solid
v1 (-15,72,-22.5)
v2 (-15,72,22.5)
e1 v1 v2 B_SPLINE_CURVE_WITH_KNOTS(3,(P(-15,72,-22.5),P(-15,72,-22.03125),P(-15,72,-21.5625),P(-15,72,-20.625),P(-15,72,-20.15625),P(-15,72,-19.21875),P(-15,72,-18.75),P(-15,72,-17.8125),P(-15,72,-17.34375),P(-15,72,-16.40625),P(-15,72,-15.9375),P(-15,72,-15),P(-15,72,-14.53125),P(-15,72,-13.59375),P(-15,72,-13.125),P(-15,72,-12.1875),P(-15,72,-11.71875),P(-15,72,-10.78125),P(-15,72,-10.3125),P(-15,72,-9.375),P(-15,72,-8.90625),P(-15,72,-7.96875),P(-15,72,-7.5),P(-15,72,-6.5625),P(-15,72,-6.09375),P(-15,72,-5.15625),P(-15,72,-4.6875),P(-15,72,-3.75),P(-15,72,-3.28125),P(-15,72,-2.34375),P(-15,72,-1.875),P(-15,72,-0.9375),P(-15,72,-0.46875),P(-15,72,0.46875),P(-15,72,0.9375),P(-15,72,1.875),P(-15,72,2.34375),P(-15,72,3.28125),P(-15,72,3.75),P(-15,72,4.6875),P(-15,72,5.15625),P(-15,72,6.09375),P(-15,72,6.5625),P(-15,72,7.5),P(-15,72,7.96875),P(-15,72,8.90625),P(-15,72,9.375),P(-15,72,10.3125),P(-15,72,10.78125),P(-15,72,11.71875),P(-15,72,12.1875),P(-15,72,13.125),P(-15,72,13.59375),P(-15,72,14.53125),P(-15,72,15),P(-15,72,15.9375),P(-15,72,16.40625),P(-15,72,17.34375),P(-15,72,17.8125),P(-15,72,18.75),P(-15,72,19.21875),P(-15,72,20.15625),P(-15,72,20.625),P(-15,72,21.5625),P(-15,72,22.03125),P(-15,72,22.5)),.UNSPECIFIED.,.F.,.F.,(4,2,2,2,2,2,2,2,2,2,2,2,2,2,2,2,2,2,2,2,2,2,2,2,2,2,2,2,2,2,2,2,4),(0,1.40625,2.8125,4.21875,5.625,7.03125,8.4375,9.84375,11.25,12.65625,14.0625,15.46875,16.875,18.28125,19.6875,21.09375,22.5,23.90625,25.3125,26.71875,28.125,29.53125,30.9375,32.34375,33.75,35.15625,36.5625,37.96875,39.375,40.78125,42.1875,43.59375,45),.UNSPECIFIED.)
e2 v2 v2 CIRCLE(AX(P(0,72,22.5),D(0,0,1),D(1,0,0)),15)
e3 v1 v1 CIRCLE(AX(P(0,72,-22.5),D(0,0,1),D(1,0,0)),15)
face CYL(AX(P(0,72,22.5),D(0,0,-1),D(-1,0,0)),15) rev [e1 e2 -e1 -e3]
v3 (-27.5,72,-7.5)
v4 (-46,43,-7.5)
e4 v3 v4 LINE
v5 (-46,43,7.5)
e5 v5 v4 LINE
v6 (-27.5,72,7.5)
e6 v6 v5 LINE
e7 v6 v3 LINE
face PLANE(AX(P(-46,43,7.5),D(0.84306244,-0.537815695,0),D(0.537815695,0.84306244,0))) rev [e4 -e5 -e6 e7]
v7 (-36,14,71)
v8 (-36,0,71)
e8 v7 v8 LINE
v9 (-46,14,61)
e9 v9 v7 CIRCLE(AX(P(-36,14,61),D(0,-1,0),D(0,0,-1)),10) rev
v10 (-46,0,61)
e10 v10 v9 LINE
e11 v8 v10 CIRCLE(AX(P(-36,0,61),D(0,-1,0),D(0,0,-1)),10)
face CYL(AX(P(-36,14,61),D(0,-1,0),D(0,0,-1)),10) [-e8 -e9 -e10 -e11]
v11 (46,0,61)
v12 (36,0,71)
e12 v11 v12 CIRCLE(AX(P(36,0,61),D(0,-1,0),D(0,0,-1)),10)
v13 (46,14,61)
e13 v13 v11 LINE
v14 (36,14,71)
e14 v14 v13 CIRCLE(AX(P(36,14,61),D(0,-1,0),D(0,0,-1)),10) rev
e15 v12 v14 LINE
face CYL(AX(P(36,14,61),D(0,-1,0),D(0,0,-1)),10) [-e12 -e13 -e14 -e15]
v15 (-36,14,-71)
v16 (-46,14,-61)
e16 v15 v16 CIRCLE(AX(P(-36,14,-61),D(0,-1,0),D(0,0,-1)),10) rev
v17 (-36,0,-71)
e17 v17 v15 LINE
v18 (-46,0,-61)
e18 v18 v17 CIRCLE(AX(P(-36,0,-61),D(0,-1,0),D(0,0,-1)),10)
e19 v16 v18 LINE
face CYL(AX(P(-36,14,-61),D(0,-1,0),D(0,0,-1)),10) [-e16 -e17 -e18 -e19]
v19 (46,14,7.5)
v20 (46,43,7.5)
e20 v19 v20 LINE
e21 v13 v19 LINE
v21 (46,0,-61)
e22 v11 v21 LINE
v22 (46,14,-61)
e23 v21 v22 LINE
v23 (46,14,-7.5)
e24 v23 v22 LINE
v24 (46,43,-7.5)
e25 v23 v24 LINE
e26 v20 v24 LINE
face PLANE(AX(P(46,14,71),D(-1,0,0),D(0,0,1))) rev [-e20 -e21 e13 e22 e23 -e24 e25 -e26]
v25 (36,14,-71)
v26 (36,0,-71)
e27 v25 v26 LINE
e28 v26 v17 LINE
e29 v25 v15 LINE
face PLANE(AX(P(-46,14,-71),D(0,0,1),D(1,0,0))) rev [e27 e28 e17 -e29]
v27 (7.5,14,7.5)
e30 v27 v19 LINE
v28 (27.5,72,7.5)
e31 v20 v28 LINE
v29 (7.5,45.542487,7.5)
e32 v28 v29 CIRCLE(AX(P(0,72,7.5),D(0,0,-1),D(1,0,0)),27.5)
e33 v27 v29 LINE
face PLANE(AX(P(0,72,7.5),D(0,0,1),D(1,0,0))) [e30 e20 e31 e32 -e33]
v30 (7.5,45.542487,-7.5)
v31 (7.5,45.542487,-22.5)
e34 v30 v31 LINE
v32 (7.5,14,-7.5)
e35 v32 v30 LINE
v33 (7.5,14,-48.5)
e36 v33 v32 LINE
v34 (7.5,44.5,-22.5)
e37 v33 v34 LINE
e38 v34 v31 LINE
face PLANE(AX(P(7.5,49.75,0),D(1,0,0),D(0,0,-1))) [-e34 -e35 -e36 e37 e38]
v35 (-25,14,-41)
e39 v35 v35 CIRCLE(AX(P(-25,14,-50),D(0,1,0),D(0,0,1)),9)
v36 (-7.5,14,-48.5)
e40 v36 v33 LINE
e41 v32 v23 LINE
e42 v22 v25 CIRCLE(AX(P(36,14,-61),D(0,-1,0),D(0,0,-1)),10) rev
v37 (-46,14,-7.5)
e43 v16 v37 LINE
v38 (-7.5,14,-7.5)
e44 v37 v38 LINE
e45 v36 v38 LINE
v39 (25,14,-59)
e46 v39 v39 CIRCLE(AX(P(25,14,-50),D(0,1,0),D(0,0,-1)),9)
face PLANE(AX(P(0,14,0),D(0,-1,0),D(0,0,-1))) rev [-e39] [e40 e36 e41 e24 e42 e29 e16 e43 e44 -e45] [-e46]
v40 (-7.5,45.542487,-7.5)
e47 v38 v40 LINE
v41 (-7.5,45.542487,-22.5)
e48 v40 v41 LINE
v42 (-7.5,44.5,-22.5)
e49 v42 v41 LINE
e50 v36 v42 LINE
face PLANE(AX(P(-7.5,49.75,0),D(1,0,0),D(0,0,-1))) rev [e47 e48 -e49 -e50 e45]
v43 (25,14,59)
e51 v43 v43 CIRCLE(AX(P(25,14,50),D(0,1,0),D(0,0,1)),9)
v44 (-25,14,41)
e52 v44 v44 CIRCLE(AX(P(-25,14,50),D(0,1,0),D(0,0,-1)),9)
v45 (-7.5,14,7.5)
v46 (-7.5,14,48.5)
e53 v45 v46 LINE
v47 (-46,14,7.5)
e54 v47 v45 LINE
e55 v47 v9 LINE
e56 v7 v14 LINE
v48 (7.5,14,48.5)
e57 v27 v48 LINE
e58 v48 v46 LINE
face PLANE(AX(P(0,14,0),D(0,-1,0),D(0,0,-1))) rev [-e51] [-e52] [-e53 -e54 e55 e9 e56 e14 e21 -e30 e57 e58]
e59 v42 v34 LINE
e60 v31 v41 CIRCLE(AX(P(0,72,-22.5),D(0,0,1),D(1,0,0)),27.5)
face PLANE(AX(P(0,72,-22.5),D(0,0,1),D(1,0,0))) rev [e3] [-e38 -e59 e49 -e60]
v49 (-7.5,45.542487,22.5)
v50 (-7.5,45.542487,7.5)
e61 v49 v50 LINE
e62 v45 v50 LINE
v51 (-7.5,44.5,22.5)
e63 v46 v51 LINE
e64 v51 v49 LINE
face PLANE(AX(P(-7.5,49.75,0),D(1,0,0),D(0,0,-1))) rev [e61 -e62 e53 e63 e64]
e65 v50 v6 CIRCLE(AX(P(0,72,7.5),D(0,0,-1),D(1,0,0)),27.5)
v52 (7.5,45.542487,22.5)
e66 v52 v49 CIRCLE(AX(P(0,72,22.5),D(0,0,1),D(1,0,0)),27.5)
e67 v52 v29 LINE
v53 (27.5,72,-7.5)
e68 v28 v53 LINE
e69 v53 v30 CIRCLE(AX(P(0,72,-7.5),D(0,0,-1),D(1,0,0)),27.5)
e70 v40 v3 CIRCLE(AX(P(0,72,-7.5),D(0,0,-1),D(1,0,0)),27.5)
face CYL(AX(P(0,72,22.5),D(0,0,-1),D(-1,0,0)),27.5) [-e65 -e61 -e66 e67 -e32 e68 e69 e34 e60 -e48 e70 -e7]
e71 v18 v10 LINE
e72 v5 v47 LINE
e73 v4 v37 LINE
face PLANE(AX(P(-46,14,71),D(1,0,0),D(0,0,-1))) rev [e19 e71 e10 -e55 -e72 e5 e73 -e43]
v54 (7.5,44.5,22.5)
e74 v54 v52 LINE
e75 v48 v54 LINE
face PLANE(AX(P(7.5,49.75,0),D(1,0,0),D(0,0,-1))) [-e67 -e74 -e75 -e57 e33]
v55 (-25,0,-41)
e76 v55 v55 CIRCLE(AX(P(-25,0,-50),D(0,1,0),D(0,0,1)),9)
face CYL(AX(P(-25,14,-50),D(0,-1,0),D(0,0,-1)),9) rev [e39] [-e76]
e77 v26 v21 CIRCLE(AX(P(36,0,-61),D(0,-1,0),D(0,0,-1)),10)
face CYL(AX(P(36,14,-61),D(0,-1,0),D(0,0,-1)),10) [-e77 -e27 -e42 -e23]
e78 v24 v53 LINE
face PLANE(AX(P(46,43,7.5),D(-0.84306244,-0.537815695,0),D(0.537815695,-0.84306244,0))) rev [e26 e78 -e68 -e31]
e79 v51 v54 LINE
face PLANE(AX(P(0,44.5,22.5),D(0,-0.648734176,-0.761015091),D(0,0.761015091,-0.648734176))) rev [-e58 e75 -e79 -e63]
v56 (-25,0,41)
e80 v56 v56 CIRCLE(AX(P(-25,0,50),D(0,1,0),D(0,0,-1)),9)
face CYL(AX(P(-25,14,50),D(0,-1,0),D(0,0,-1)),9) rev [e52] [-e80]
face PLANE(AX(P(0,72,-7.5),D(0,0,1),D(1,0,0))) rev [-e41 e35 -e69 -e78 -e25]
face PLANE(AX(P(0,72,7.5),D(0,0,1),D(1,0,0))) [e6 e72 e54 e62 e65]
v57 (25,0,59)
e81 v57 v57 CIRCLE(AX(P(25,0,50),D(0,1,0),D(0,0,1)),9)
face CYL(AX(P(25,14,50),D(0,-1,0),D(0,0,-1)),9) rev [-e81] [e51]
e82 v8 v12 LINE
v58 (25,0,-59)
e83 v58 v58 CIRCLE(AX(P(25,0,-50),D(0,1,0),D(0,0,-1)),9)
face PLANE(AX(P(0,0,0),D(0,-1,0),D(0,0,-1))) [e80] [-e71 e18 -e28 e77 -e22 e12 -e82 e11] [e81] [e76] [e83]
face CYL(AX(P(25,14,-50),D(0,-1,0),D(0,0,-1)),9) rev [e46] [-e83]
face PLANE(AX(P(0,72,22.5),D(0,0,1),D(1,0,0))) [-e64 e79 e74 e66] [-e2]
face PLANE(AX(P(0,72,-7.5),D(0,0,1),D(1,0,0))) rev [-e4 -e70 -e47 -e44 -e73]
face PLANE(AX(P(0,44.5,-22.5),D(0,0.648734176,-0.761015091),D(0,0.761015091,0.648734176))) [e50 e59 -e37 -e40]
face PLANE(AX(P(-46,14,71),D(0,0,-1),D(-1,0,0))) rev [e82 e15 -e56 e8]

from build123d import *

# Parameters (mm, degrees)
ESQUISSE1_W        = 92
ESQUISSE1_H        = 142
ESQUISSE1_R        = 9
BOSS_EXTRU_1_DEPTH = 14
CONG_1_R           = 10
ESQUISSE2_R        = 27.5
ESQUISSE2_R_2      = 15
BOSS_EXTRU_2_DEPTH = 22.5
BOSS_EXTRU_3_DEPTH = 7.5
NERVURE1_START     = -7.5
NERVURE1_DEPTH     = 15


with BuildPart() as part:
    # Esquisse1 → Boss.-Extru.1 (new body)
    with BuildSketch(Plane(origin=(0, 0, 0), x_dir=(1, 0, 0), z_dir=(0, 1, 0))):
        Rectangle(ESQUISSE1_W, ESQUISSE1_H)
        with Locations(Location((25, -50, 0), (0, 0, 270))):
            Circle(ESQUISSE1_R, mode=Mode.SUBTRACT)
        with Locations(Location((25, 50, 0), (0, 0, 90))):
            Circle(ESQUISSE1_R, mode=Mode.SUBTRACT)
        with Locations(Location((-25, -50, 0), (0, 0, 90))):
            Circle(ESQUISSE1_R, mode=Mode.SUBTRACT)
        with Locations(Location((-25, 50, 0), (0, 0, 270))):
            Circle(ESQUISSE1_R, mode=Mode.SUBTRACT)
    extrude(amount=BOSS_EXTRU_1_DEPTH)

    # Congé1
    cong_1_edges = [part.edges().sort_by_distance(p)[0] for p in [
        (46, 7, 71),
        (-46, 7, 71),
        (-46, 7, -71),
        (46, 7, -71),
    ]]
    fillet(cong_1_edges, radius=CONG_1_R)



with BuildPart() as body_2:
    # Esquisse2 → Boss.-Extru.2 (new, symmetric)
    with BuildSketch(Plane.XY):
        with Locations(Location((0, 72, 0), (0, 0, 180))):
            Circle(ESQUISSE2_R)
        with Locations(Location((0, 72, 0), (0, 0, 180))):
            Circle(ESQUISSE2_R_2, mode=Mode.SUBTRACT)
    extrude(amount=BOSS_EXTRU_2_DEPTH, both=True)


with BuildPart() as part_1:
    add(part.part)

    add(body_2.part)  # Boss.-Extru.3 merges body 2
    # Esquisse3 → Boss.-Extru.3 (add, symmetric)
    with BuildSketch(Plane.XY):
        with BuildLine():
            Line((46, 14), (46, 43))
            Line((46, 43), (27.5, 72))
            ThreePointArc((27.5, 72), (0, 44.5), (-27.5, 72))
            Line((-27.5, 72), (-46, 43))
            Line((-46, 43), (-46, 14))
            Line((-46, 14), (46, 14))
        make_face()
    extrude(amount=BOSS_EXTRU_3_DEPTH, both=True)

    # Nervure1: read off the stored shape, not the designer's step
    # Nervure1 outline → Nervure1 (add)
    with BuildSketch(Plane(origin=(0, 0, 0), x_dir=(0, 0, -1), z_dir=(1, 0, 0)).offset(NERVURE1_START)):
        Polygon((-22.5, 44.5), (-48.5, 14), (-7.5, 14), (-7.5, 45.542486889), (-22.5, 45.542486889), align=None)
    nervure1 = extrude(amount=NERVURE1_DEPTH)

    # Symétrie1: Nervure1 across plane
    add(nervure1.mirror(Plane.XY))


solid = part_1.part
